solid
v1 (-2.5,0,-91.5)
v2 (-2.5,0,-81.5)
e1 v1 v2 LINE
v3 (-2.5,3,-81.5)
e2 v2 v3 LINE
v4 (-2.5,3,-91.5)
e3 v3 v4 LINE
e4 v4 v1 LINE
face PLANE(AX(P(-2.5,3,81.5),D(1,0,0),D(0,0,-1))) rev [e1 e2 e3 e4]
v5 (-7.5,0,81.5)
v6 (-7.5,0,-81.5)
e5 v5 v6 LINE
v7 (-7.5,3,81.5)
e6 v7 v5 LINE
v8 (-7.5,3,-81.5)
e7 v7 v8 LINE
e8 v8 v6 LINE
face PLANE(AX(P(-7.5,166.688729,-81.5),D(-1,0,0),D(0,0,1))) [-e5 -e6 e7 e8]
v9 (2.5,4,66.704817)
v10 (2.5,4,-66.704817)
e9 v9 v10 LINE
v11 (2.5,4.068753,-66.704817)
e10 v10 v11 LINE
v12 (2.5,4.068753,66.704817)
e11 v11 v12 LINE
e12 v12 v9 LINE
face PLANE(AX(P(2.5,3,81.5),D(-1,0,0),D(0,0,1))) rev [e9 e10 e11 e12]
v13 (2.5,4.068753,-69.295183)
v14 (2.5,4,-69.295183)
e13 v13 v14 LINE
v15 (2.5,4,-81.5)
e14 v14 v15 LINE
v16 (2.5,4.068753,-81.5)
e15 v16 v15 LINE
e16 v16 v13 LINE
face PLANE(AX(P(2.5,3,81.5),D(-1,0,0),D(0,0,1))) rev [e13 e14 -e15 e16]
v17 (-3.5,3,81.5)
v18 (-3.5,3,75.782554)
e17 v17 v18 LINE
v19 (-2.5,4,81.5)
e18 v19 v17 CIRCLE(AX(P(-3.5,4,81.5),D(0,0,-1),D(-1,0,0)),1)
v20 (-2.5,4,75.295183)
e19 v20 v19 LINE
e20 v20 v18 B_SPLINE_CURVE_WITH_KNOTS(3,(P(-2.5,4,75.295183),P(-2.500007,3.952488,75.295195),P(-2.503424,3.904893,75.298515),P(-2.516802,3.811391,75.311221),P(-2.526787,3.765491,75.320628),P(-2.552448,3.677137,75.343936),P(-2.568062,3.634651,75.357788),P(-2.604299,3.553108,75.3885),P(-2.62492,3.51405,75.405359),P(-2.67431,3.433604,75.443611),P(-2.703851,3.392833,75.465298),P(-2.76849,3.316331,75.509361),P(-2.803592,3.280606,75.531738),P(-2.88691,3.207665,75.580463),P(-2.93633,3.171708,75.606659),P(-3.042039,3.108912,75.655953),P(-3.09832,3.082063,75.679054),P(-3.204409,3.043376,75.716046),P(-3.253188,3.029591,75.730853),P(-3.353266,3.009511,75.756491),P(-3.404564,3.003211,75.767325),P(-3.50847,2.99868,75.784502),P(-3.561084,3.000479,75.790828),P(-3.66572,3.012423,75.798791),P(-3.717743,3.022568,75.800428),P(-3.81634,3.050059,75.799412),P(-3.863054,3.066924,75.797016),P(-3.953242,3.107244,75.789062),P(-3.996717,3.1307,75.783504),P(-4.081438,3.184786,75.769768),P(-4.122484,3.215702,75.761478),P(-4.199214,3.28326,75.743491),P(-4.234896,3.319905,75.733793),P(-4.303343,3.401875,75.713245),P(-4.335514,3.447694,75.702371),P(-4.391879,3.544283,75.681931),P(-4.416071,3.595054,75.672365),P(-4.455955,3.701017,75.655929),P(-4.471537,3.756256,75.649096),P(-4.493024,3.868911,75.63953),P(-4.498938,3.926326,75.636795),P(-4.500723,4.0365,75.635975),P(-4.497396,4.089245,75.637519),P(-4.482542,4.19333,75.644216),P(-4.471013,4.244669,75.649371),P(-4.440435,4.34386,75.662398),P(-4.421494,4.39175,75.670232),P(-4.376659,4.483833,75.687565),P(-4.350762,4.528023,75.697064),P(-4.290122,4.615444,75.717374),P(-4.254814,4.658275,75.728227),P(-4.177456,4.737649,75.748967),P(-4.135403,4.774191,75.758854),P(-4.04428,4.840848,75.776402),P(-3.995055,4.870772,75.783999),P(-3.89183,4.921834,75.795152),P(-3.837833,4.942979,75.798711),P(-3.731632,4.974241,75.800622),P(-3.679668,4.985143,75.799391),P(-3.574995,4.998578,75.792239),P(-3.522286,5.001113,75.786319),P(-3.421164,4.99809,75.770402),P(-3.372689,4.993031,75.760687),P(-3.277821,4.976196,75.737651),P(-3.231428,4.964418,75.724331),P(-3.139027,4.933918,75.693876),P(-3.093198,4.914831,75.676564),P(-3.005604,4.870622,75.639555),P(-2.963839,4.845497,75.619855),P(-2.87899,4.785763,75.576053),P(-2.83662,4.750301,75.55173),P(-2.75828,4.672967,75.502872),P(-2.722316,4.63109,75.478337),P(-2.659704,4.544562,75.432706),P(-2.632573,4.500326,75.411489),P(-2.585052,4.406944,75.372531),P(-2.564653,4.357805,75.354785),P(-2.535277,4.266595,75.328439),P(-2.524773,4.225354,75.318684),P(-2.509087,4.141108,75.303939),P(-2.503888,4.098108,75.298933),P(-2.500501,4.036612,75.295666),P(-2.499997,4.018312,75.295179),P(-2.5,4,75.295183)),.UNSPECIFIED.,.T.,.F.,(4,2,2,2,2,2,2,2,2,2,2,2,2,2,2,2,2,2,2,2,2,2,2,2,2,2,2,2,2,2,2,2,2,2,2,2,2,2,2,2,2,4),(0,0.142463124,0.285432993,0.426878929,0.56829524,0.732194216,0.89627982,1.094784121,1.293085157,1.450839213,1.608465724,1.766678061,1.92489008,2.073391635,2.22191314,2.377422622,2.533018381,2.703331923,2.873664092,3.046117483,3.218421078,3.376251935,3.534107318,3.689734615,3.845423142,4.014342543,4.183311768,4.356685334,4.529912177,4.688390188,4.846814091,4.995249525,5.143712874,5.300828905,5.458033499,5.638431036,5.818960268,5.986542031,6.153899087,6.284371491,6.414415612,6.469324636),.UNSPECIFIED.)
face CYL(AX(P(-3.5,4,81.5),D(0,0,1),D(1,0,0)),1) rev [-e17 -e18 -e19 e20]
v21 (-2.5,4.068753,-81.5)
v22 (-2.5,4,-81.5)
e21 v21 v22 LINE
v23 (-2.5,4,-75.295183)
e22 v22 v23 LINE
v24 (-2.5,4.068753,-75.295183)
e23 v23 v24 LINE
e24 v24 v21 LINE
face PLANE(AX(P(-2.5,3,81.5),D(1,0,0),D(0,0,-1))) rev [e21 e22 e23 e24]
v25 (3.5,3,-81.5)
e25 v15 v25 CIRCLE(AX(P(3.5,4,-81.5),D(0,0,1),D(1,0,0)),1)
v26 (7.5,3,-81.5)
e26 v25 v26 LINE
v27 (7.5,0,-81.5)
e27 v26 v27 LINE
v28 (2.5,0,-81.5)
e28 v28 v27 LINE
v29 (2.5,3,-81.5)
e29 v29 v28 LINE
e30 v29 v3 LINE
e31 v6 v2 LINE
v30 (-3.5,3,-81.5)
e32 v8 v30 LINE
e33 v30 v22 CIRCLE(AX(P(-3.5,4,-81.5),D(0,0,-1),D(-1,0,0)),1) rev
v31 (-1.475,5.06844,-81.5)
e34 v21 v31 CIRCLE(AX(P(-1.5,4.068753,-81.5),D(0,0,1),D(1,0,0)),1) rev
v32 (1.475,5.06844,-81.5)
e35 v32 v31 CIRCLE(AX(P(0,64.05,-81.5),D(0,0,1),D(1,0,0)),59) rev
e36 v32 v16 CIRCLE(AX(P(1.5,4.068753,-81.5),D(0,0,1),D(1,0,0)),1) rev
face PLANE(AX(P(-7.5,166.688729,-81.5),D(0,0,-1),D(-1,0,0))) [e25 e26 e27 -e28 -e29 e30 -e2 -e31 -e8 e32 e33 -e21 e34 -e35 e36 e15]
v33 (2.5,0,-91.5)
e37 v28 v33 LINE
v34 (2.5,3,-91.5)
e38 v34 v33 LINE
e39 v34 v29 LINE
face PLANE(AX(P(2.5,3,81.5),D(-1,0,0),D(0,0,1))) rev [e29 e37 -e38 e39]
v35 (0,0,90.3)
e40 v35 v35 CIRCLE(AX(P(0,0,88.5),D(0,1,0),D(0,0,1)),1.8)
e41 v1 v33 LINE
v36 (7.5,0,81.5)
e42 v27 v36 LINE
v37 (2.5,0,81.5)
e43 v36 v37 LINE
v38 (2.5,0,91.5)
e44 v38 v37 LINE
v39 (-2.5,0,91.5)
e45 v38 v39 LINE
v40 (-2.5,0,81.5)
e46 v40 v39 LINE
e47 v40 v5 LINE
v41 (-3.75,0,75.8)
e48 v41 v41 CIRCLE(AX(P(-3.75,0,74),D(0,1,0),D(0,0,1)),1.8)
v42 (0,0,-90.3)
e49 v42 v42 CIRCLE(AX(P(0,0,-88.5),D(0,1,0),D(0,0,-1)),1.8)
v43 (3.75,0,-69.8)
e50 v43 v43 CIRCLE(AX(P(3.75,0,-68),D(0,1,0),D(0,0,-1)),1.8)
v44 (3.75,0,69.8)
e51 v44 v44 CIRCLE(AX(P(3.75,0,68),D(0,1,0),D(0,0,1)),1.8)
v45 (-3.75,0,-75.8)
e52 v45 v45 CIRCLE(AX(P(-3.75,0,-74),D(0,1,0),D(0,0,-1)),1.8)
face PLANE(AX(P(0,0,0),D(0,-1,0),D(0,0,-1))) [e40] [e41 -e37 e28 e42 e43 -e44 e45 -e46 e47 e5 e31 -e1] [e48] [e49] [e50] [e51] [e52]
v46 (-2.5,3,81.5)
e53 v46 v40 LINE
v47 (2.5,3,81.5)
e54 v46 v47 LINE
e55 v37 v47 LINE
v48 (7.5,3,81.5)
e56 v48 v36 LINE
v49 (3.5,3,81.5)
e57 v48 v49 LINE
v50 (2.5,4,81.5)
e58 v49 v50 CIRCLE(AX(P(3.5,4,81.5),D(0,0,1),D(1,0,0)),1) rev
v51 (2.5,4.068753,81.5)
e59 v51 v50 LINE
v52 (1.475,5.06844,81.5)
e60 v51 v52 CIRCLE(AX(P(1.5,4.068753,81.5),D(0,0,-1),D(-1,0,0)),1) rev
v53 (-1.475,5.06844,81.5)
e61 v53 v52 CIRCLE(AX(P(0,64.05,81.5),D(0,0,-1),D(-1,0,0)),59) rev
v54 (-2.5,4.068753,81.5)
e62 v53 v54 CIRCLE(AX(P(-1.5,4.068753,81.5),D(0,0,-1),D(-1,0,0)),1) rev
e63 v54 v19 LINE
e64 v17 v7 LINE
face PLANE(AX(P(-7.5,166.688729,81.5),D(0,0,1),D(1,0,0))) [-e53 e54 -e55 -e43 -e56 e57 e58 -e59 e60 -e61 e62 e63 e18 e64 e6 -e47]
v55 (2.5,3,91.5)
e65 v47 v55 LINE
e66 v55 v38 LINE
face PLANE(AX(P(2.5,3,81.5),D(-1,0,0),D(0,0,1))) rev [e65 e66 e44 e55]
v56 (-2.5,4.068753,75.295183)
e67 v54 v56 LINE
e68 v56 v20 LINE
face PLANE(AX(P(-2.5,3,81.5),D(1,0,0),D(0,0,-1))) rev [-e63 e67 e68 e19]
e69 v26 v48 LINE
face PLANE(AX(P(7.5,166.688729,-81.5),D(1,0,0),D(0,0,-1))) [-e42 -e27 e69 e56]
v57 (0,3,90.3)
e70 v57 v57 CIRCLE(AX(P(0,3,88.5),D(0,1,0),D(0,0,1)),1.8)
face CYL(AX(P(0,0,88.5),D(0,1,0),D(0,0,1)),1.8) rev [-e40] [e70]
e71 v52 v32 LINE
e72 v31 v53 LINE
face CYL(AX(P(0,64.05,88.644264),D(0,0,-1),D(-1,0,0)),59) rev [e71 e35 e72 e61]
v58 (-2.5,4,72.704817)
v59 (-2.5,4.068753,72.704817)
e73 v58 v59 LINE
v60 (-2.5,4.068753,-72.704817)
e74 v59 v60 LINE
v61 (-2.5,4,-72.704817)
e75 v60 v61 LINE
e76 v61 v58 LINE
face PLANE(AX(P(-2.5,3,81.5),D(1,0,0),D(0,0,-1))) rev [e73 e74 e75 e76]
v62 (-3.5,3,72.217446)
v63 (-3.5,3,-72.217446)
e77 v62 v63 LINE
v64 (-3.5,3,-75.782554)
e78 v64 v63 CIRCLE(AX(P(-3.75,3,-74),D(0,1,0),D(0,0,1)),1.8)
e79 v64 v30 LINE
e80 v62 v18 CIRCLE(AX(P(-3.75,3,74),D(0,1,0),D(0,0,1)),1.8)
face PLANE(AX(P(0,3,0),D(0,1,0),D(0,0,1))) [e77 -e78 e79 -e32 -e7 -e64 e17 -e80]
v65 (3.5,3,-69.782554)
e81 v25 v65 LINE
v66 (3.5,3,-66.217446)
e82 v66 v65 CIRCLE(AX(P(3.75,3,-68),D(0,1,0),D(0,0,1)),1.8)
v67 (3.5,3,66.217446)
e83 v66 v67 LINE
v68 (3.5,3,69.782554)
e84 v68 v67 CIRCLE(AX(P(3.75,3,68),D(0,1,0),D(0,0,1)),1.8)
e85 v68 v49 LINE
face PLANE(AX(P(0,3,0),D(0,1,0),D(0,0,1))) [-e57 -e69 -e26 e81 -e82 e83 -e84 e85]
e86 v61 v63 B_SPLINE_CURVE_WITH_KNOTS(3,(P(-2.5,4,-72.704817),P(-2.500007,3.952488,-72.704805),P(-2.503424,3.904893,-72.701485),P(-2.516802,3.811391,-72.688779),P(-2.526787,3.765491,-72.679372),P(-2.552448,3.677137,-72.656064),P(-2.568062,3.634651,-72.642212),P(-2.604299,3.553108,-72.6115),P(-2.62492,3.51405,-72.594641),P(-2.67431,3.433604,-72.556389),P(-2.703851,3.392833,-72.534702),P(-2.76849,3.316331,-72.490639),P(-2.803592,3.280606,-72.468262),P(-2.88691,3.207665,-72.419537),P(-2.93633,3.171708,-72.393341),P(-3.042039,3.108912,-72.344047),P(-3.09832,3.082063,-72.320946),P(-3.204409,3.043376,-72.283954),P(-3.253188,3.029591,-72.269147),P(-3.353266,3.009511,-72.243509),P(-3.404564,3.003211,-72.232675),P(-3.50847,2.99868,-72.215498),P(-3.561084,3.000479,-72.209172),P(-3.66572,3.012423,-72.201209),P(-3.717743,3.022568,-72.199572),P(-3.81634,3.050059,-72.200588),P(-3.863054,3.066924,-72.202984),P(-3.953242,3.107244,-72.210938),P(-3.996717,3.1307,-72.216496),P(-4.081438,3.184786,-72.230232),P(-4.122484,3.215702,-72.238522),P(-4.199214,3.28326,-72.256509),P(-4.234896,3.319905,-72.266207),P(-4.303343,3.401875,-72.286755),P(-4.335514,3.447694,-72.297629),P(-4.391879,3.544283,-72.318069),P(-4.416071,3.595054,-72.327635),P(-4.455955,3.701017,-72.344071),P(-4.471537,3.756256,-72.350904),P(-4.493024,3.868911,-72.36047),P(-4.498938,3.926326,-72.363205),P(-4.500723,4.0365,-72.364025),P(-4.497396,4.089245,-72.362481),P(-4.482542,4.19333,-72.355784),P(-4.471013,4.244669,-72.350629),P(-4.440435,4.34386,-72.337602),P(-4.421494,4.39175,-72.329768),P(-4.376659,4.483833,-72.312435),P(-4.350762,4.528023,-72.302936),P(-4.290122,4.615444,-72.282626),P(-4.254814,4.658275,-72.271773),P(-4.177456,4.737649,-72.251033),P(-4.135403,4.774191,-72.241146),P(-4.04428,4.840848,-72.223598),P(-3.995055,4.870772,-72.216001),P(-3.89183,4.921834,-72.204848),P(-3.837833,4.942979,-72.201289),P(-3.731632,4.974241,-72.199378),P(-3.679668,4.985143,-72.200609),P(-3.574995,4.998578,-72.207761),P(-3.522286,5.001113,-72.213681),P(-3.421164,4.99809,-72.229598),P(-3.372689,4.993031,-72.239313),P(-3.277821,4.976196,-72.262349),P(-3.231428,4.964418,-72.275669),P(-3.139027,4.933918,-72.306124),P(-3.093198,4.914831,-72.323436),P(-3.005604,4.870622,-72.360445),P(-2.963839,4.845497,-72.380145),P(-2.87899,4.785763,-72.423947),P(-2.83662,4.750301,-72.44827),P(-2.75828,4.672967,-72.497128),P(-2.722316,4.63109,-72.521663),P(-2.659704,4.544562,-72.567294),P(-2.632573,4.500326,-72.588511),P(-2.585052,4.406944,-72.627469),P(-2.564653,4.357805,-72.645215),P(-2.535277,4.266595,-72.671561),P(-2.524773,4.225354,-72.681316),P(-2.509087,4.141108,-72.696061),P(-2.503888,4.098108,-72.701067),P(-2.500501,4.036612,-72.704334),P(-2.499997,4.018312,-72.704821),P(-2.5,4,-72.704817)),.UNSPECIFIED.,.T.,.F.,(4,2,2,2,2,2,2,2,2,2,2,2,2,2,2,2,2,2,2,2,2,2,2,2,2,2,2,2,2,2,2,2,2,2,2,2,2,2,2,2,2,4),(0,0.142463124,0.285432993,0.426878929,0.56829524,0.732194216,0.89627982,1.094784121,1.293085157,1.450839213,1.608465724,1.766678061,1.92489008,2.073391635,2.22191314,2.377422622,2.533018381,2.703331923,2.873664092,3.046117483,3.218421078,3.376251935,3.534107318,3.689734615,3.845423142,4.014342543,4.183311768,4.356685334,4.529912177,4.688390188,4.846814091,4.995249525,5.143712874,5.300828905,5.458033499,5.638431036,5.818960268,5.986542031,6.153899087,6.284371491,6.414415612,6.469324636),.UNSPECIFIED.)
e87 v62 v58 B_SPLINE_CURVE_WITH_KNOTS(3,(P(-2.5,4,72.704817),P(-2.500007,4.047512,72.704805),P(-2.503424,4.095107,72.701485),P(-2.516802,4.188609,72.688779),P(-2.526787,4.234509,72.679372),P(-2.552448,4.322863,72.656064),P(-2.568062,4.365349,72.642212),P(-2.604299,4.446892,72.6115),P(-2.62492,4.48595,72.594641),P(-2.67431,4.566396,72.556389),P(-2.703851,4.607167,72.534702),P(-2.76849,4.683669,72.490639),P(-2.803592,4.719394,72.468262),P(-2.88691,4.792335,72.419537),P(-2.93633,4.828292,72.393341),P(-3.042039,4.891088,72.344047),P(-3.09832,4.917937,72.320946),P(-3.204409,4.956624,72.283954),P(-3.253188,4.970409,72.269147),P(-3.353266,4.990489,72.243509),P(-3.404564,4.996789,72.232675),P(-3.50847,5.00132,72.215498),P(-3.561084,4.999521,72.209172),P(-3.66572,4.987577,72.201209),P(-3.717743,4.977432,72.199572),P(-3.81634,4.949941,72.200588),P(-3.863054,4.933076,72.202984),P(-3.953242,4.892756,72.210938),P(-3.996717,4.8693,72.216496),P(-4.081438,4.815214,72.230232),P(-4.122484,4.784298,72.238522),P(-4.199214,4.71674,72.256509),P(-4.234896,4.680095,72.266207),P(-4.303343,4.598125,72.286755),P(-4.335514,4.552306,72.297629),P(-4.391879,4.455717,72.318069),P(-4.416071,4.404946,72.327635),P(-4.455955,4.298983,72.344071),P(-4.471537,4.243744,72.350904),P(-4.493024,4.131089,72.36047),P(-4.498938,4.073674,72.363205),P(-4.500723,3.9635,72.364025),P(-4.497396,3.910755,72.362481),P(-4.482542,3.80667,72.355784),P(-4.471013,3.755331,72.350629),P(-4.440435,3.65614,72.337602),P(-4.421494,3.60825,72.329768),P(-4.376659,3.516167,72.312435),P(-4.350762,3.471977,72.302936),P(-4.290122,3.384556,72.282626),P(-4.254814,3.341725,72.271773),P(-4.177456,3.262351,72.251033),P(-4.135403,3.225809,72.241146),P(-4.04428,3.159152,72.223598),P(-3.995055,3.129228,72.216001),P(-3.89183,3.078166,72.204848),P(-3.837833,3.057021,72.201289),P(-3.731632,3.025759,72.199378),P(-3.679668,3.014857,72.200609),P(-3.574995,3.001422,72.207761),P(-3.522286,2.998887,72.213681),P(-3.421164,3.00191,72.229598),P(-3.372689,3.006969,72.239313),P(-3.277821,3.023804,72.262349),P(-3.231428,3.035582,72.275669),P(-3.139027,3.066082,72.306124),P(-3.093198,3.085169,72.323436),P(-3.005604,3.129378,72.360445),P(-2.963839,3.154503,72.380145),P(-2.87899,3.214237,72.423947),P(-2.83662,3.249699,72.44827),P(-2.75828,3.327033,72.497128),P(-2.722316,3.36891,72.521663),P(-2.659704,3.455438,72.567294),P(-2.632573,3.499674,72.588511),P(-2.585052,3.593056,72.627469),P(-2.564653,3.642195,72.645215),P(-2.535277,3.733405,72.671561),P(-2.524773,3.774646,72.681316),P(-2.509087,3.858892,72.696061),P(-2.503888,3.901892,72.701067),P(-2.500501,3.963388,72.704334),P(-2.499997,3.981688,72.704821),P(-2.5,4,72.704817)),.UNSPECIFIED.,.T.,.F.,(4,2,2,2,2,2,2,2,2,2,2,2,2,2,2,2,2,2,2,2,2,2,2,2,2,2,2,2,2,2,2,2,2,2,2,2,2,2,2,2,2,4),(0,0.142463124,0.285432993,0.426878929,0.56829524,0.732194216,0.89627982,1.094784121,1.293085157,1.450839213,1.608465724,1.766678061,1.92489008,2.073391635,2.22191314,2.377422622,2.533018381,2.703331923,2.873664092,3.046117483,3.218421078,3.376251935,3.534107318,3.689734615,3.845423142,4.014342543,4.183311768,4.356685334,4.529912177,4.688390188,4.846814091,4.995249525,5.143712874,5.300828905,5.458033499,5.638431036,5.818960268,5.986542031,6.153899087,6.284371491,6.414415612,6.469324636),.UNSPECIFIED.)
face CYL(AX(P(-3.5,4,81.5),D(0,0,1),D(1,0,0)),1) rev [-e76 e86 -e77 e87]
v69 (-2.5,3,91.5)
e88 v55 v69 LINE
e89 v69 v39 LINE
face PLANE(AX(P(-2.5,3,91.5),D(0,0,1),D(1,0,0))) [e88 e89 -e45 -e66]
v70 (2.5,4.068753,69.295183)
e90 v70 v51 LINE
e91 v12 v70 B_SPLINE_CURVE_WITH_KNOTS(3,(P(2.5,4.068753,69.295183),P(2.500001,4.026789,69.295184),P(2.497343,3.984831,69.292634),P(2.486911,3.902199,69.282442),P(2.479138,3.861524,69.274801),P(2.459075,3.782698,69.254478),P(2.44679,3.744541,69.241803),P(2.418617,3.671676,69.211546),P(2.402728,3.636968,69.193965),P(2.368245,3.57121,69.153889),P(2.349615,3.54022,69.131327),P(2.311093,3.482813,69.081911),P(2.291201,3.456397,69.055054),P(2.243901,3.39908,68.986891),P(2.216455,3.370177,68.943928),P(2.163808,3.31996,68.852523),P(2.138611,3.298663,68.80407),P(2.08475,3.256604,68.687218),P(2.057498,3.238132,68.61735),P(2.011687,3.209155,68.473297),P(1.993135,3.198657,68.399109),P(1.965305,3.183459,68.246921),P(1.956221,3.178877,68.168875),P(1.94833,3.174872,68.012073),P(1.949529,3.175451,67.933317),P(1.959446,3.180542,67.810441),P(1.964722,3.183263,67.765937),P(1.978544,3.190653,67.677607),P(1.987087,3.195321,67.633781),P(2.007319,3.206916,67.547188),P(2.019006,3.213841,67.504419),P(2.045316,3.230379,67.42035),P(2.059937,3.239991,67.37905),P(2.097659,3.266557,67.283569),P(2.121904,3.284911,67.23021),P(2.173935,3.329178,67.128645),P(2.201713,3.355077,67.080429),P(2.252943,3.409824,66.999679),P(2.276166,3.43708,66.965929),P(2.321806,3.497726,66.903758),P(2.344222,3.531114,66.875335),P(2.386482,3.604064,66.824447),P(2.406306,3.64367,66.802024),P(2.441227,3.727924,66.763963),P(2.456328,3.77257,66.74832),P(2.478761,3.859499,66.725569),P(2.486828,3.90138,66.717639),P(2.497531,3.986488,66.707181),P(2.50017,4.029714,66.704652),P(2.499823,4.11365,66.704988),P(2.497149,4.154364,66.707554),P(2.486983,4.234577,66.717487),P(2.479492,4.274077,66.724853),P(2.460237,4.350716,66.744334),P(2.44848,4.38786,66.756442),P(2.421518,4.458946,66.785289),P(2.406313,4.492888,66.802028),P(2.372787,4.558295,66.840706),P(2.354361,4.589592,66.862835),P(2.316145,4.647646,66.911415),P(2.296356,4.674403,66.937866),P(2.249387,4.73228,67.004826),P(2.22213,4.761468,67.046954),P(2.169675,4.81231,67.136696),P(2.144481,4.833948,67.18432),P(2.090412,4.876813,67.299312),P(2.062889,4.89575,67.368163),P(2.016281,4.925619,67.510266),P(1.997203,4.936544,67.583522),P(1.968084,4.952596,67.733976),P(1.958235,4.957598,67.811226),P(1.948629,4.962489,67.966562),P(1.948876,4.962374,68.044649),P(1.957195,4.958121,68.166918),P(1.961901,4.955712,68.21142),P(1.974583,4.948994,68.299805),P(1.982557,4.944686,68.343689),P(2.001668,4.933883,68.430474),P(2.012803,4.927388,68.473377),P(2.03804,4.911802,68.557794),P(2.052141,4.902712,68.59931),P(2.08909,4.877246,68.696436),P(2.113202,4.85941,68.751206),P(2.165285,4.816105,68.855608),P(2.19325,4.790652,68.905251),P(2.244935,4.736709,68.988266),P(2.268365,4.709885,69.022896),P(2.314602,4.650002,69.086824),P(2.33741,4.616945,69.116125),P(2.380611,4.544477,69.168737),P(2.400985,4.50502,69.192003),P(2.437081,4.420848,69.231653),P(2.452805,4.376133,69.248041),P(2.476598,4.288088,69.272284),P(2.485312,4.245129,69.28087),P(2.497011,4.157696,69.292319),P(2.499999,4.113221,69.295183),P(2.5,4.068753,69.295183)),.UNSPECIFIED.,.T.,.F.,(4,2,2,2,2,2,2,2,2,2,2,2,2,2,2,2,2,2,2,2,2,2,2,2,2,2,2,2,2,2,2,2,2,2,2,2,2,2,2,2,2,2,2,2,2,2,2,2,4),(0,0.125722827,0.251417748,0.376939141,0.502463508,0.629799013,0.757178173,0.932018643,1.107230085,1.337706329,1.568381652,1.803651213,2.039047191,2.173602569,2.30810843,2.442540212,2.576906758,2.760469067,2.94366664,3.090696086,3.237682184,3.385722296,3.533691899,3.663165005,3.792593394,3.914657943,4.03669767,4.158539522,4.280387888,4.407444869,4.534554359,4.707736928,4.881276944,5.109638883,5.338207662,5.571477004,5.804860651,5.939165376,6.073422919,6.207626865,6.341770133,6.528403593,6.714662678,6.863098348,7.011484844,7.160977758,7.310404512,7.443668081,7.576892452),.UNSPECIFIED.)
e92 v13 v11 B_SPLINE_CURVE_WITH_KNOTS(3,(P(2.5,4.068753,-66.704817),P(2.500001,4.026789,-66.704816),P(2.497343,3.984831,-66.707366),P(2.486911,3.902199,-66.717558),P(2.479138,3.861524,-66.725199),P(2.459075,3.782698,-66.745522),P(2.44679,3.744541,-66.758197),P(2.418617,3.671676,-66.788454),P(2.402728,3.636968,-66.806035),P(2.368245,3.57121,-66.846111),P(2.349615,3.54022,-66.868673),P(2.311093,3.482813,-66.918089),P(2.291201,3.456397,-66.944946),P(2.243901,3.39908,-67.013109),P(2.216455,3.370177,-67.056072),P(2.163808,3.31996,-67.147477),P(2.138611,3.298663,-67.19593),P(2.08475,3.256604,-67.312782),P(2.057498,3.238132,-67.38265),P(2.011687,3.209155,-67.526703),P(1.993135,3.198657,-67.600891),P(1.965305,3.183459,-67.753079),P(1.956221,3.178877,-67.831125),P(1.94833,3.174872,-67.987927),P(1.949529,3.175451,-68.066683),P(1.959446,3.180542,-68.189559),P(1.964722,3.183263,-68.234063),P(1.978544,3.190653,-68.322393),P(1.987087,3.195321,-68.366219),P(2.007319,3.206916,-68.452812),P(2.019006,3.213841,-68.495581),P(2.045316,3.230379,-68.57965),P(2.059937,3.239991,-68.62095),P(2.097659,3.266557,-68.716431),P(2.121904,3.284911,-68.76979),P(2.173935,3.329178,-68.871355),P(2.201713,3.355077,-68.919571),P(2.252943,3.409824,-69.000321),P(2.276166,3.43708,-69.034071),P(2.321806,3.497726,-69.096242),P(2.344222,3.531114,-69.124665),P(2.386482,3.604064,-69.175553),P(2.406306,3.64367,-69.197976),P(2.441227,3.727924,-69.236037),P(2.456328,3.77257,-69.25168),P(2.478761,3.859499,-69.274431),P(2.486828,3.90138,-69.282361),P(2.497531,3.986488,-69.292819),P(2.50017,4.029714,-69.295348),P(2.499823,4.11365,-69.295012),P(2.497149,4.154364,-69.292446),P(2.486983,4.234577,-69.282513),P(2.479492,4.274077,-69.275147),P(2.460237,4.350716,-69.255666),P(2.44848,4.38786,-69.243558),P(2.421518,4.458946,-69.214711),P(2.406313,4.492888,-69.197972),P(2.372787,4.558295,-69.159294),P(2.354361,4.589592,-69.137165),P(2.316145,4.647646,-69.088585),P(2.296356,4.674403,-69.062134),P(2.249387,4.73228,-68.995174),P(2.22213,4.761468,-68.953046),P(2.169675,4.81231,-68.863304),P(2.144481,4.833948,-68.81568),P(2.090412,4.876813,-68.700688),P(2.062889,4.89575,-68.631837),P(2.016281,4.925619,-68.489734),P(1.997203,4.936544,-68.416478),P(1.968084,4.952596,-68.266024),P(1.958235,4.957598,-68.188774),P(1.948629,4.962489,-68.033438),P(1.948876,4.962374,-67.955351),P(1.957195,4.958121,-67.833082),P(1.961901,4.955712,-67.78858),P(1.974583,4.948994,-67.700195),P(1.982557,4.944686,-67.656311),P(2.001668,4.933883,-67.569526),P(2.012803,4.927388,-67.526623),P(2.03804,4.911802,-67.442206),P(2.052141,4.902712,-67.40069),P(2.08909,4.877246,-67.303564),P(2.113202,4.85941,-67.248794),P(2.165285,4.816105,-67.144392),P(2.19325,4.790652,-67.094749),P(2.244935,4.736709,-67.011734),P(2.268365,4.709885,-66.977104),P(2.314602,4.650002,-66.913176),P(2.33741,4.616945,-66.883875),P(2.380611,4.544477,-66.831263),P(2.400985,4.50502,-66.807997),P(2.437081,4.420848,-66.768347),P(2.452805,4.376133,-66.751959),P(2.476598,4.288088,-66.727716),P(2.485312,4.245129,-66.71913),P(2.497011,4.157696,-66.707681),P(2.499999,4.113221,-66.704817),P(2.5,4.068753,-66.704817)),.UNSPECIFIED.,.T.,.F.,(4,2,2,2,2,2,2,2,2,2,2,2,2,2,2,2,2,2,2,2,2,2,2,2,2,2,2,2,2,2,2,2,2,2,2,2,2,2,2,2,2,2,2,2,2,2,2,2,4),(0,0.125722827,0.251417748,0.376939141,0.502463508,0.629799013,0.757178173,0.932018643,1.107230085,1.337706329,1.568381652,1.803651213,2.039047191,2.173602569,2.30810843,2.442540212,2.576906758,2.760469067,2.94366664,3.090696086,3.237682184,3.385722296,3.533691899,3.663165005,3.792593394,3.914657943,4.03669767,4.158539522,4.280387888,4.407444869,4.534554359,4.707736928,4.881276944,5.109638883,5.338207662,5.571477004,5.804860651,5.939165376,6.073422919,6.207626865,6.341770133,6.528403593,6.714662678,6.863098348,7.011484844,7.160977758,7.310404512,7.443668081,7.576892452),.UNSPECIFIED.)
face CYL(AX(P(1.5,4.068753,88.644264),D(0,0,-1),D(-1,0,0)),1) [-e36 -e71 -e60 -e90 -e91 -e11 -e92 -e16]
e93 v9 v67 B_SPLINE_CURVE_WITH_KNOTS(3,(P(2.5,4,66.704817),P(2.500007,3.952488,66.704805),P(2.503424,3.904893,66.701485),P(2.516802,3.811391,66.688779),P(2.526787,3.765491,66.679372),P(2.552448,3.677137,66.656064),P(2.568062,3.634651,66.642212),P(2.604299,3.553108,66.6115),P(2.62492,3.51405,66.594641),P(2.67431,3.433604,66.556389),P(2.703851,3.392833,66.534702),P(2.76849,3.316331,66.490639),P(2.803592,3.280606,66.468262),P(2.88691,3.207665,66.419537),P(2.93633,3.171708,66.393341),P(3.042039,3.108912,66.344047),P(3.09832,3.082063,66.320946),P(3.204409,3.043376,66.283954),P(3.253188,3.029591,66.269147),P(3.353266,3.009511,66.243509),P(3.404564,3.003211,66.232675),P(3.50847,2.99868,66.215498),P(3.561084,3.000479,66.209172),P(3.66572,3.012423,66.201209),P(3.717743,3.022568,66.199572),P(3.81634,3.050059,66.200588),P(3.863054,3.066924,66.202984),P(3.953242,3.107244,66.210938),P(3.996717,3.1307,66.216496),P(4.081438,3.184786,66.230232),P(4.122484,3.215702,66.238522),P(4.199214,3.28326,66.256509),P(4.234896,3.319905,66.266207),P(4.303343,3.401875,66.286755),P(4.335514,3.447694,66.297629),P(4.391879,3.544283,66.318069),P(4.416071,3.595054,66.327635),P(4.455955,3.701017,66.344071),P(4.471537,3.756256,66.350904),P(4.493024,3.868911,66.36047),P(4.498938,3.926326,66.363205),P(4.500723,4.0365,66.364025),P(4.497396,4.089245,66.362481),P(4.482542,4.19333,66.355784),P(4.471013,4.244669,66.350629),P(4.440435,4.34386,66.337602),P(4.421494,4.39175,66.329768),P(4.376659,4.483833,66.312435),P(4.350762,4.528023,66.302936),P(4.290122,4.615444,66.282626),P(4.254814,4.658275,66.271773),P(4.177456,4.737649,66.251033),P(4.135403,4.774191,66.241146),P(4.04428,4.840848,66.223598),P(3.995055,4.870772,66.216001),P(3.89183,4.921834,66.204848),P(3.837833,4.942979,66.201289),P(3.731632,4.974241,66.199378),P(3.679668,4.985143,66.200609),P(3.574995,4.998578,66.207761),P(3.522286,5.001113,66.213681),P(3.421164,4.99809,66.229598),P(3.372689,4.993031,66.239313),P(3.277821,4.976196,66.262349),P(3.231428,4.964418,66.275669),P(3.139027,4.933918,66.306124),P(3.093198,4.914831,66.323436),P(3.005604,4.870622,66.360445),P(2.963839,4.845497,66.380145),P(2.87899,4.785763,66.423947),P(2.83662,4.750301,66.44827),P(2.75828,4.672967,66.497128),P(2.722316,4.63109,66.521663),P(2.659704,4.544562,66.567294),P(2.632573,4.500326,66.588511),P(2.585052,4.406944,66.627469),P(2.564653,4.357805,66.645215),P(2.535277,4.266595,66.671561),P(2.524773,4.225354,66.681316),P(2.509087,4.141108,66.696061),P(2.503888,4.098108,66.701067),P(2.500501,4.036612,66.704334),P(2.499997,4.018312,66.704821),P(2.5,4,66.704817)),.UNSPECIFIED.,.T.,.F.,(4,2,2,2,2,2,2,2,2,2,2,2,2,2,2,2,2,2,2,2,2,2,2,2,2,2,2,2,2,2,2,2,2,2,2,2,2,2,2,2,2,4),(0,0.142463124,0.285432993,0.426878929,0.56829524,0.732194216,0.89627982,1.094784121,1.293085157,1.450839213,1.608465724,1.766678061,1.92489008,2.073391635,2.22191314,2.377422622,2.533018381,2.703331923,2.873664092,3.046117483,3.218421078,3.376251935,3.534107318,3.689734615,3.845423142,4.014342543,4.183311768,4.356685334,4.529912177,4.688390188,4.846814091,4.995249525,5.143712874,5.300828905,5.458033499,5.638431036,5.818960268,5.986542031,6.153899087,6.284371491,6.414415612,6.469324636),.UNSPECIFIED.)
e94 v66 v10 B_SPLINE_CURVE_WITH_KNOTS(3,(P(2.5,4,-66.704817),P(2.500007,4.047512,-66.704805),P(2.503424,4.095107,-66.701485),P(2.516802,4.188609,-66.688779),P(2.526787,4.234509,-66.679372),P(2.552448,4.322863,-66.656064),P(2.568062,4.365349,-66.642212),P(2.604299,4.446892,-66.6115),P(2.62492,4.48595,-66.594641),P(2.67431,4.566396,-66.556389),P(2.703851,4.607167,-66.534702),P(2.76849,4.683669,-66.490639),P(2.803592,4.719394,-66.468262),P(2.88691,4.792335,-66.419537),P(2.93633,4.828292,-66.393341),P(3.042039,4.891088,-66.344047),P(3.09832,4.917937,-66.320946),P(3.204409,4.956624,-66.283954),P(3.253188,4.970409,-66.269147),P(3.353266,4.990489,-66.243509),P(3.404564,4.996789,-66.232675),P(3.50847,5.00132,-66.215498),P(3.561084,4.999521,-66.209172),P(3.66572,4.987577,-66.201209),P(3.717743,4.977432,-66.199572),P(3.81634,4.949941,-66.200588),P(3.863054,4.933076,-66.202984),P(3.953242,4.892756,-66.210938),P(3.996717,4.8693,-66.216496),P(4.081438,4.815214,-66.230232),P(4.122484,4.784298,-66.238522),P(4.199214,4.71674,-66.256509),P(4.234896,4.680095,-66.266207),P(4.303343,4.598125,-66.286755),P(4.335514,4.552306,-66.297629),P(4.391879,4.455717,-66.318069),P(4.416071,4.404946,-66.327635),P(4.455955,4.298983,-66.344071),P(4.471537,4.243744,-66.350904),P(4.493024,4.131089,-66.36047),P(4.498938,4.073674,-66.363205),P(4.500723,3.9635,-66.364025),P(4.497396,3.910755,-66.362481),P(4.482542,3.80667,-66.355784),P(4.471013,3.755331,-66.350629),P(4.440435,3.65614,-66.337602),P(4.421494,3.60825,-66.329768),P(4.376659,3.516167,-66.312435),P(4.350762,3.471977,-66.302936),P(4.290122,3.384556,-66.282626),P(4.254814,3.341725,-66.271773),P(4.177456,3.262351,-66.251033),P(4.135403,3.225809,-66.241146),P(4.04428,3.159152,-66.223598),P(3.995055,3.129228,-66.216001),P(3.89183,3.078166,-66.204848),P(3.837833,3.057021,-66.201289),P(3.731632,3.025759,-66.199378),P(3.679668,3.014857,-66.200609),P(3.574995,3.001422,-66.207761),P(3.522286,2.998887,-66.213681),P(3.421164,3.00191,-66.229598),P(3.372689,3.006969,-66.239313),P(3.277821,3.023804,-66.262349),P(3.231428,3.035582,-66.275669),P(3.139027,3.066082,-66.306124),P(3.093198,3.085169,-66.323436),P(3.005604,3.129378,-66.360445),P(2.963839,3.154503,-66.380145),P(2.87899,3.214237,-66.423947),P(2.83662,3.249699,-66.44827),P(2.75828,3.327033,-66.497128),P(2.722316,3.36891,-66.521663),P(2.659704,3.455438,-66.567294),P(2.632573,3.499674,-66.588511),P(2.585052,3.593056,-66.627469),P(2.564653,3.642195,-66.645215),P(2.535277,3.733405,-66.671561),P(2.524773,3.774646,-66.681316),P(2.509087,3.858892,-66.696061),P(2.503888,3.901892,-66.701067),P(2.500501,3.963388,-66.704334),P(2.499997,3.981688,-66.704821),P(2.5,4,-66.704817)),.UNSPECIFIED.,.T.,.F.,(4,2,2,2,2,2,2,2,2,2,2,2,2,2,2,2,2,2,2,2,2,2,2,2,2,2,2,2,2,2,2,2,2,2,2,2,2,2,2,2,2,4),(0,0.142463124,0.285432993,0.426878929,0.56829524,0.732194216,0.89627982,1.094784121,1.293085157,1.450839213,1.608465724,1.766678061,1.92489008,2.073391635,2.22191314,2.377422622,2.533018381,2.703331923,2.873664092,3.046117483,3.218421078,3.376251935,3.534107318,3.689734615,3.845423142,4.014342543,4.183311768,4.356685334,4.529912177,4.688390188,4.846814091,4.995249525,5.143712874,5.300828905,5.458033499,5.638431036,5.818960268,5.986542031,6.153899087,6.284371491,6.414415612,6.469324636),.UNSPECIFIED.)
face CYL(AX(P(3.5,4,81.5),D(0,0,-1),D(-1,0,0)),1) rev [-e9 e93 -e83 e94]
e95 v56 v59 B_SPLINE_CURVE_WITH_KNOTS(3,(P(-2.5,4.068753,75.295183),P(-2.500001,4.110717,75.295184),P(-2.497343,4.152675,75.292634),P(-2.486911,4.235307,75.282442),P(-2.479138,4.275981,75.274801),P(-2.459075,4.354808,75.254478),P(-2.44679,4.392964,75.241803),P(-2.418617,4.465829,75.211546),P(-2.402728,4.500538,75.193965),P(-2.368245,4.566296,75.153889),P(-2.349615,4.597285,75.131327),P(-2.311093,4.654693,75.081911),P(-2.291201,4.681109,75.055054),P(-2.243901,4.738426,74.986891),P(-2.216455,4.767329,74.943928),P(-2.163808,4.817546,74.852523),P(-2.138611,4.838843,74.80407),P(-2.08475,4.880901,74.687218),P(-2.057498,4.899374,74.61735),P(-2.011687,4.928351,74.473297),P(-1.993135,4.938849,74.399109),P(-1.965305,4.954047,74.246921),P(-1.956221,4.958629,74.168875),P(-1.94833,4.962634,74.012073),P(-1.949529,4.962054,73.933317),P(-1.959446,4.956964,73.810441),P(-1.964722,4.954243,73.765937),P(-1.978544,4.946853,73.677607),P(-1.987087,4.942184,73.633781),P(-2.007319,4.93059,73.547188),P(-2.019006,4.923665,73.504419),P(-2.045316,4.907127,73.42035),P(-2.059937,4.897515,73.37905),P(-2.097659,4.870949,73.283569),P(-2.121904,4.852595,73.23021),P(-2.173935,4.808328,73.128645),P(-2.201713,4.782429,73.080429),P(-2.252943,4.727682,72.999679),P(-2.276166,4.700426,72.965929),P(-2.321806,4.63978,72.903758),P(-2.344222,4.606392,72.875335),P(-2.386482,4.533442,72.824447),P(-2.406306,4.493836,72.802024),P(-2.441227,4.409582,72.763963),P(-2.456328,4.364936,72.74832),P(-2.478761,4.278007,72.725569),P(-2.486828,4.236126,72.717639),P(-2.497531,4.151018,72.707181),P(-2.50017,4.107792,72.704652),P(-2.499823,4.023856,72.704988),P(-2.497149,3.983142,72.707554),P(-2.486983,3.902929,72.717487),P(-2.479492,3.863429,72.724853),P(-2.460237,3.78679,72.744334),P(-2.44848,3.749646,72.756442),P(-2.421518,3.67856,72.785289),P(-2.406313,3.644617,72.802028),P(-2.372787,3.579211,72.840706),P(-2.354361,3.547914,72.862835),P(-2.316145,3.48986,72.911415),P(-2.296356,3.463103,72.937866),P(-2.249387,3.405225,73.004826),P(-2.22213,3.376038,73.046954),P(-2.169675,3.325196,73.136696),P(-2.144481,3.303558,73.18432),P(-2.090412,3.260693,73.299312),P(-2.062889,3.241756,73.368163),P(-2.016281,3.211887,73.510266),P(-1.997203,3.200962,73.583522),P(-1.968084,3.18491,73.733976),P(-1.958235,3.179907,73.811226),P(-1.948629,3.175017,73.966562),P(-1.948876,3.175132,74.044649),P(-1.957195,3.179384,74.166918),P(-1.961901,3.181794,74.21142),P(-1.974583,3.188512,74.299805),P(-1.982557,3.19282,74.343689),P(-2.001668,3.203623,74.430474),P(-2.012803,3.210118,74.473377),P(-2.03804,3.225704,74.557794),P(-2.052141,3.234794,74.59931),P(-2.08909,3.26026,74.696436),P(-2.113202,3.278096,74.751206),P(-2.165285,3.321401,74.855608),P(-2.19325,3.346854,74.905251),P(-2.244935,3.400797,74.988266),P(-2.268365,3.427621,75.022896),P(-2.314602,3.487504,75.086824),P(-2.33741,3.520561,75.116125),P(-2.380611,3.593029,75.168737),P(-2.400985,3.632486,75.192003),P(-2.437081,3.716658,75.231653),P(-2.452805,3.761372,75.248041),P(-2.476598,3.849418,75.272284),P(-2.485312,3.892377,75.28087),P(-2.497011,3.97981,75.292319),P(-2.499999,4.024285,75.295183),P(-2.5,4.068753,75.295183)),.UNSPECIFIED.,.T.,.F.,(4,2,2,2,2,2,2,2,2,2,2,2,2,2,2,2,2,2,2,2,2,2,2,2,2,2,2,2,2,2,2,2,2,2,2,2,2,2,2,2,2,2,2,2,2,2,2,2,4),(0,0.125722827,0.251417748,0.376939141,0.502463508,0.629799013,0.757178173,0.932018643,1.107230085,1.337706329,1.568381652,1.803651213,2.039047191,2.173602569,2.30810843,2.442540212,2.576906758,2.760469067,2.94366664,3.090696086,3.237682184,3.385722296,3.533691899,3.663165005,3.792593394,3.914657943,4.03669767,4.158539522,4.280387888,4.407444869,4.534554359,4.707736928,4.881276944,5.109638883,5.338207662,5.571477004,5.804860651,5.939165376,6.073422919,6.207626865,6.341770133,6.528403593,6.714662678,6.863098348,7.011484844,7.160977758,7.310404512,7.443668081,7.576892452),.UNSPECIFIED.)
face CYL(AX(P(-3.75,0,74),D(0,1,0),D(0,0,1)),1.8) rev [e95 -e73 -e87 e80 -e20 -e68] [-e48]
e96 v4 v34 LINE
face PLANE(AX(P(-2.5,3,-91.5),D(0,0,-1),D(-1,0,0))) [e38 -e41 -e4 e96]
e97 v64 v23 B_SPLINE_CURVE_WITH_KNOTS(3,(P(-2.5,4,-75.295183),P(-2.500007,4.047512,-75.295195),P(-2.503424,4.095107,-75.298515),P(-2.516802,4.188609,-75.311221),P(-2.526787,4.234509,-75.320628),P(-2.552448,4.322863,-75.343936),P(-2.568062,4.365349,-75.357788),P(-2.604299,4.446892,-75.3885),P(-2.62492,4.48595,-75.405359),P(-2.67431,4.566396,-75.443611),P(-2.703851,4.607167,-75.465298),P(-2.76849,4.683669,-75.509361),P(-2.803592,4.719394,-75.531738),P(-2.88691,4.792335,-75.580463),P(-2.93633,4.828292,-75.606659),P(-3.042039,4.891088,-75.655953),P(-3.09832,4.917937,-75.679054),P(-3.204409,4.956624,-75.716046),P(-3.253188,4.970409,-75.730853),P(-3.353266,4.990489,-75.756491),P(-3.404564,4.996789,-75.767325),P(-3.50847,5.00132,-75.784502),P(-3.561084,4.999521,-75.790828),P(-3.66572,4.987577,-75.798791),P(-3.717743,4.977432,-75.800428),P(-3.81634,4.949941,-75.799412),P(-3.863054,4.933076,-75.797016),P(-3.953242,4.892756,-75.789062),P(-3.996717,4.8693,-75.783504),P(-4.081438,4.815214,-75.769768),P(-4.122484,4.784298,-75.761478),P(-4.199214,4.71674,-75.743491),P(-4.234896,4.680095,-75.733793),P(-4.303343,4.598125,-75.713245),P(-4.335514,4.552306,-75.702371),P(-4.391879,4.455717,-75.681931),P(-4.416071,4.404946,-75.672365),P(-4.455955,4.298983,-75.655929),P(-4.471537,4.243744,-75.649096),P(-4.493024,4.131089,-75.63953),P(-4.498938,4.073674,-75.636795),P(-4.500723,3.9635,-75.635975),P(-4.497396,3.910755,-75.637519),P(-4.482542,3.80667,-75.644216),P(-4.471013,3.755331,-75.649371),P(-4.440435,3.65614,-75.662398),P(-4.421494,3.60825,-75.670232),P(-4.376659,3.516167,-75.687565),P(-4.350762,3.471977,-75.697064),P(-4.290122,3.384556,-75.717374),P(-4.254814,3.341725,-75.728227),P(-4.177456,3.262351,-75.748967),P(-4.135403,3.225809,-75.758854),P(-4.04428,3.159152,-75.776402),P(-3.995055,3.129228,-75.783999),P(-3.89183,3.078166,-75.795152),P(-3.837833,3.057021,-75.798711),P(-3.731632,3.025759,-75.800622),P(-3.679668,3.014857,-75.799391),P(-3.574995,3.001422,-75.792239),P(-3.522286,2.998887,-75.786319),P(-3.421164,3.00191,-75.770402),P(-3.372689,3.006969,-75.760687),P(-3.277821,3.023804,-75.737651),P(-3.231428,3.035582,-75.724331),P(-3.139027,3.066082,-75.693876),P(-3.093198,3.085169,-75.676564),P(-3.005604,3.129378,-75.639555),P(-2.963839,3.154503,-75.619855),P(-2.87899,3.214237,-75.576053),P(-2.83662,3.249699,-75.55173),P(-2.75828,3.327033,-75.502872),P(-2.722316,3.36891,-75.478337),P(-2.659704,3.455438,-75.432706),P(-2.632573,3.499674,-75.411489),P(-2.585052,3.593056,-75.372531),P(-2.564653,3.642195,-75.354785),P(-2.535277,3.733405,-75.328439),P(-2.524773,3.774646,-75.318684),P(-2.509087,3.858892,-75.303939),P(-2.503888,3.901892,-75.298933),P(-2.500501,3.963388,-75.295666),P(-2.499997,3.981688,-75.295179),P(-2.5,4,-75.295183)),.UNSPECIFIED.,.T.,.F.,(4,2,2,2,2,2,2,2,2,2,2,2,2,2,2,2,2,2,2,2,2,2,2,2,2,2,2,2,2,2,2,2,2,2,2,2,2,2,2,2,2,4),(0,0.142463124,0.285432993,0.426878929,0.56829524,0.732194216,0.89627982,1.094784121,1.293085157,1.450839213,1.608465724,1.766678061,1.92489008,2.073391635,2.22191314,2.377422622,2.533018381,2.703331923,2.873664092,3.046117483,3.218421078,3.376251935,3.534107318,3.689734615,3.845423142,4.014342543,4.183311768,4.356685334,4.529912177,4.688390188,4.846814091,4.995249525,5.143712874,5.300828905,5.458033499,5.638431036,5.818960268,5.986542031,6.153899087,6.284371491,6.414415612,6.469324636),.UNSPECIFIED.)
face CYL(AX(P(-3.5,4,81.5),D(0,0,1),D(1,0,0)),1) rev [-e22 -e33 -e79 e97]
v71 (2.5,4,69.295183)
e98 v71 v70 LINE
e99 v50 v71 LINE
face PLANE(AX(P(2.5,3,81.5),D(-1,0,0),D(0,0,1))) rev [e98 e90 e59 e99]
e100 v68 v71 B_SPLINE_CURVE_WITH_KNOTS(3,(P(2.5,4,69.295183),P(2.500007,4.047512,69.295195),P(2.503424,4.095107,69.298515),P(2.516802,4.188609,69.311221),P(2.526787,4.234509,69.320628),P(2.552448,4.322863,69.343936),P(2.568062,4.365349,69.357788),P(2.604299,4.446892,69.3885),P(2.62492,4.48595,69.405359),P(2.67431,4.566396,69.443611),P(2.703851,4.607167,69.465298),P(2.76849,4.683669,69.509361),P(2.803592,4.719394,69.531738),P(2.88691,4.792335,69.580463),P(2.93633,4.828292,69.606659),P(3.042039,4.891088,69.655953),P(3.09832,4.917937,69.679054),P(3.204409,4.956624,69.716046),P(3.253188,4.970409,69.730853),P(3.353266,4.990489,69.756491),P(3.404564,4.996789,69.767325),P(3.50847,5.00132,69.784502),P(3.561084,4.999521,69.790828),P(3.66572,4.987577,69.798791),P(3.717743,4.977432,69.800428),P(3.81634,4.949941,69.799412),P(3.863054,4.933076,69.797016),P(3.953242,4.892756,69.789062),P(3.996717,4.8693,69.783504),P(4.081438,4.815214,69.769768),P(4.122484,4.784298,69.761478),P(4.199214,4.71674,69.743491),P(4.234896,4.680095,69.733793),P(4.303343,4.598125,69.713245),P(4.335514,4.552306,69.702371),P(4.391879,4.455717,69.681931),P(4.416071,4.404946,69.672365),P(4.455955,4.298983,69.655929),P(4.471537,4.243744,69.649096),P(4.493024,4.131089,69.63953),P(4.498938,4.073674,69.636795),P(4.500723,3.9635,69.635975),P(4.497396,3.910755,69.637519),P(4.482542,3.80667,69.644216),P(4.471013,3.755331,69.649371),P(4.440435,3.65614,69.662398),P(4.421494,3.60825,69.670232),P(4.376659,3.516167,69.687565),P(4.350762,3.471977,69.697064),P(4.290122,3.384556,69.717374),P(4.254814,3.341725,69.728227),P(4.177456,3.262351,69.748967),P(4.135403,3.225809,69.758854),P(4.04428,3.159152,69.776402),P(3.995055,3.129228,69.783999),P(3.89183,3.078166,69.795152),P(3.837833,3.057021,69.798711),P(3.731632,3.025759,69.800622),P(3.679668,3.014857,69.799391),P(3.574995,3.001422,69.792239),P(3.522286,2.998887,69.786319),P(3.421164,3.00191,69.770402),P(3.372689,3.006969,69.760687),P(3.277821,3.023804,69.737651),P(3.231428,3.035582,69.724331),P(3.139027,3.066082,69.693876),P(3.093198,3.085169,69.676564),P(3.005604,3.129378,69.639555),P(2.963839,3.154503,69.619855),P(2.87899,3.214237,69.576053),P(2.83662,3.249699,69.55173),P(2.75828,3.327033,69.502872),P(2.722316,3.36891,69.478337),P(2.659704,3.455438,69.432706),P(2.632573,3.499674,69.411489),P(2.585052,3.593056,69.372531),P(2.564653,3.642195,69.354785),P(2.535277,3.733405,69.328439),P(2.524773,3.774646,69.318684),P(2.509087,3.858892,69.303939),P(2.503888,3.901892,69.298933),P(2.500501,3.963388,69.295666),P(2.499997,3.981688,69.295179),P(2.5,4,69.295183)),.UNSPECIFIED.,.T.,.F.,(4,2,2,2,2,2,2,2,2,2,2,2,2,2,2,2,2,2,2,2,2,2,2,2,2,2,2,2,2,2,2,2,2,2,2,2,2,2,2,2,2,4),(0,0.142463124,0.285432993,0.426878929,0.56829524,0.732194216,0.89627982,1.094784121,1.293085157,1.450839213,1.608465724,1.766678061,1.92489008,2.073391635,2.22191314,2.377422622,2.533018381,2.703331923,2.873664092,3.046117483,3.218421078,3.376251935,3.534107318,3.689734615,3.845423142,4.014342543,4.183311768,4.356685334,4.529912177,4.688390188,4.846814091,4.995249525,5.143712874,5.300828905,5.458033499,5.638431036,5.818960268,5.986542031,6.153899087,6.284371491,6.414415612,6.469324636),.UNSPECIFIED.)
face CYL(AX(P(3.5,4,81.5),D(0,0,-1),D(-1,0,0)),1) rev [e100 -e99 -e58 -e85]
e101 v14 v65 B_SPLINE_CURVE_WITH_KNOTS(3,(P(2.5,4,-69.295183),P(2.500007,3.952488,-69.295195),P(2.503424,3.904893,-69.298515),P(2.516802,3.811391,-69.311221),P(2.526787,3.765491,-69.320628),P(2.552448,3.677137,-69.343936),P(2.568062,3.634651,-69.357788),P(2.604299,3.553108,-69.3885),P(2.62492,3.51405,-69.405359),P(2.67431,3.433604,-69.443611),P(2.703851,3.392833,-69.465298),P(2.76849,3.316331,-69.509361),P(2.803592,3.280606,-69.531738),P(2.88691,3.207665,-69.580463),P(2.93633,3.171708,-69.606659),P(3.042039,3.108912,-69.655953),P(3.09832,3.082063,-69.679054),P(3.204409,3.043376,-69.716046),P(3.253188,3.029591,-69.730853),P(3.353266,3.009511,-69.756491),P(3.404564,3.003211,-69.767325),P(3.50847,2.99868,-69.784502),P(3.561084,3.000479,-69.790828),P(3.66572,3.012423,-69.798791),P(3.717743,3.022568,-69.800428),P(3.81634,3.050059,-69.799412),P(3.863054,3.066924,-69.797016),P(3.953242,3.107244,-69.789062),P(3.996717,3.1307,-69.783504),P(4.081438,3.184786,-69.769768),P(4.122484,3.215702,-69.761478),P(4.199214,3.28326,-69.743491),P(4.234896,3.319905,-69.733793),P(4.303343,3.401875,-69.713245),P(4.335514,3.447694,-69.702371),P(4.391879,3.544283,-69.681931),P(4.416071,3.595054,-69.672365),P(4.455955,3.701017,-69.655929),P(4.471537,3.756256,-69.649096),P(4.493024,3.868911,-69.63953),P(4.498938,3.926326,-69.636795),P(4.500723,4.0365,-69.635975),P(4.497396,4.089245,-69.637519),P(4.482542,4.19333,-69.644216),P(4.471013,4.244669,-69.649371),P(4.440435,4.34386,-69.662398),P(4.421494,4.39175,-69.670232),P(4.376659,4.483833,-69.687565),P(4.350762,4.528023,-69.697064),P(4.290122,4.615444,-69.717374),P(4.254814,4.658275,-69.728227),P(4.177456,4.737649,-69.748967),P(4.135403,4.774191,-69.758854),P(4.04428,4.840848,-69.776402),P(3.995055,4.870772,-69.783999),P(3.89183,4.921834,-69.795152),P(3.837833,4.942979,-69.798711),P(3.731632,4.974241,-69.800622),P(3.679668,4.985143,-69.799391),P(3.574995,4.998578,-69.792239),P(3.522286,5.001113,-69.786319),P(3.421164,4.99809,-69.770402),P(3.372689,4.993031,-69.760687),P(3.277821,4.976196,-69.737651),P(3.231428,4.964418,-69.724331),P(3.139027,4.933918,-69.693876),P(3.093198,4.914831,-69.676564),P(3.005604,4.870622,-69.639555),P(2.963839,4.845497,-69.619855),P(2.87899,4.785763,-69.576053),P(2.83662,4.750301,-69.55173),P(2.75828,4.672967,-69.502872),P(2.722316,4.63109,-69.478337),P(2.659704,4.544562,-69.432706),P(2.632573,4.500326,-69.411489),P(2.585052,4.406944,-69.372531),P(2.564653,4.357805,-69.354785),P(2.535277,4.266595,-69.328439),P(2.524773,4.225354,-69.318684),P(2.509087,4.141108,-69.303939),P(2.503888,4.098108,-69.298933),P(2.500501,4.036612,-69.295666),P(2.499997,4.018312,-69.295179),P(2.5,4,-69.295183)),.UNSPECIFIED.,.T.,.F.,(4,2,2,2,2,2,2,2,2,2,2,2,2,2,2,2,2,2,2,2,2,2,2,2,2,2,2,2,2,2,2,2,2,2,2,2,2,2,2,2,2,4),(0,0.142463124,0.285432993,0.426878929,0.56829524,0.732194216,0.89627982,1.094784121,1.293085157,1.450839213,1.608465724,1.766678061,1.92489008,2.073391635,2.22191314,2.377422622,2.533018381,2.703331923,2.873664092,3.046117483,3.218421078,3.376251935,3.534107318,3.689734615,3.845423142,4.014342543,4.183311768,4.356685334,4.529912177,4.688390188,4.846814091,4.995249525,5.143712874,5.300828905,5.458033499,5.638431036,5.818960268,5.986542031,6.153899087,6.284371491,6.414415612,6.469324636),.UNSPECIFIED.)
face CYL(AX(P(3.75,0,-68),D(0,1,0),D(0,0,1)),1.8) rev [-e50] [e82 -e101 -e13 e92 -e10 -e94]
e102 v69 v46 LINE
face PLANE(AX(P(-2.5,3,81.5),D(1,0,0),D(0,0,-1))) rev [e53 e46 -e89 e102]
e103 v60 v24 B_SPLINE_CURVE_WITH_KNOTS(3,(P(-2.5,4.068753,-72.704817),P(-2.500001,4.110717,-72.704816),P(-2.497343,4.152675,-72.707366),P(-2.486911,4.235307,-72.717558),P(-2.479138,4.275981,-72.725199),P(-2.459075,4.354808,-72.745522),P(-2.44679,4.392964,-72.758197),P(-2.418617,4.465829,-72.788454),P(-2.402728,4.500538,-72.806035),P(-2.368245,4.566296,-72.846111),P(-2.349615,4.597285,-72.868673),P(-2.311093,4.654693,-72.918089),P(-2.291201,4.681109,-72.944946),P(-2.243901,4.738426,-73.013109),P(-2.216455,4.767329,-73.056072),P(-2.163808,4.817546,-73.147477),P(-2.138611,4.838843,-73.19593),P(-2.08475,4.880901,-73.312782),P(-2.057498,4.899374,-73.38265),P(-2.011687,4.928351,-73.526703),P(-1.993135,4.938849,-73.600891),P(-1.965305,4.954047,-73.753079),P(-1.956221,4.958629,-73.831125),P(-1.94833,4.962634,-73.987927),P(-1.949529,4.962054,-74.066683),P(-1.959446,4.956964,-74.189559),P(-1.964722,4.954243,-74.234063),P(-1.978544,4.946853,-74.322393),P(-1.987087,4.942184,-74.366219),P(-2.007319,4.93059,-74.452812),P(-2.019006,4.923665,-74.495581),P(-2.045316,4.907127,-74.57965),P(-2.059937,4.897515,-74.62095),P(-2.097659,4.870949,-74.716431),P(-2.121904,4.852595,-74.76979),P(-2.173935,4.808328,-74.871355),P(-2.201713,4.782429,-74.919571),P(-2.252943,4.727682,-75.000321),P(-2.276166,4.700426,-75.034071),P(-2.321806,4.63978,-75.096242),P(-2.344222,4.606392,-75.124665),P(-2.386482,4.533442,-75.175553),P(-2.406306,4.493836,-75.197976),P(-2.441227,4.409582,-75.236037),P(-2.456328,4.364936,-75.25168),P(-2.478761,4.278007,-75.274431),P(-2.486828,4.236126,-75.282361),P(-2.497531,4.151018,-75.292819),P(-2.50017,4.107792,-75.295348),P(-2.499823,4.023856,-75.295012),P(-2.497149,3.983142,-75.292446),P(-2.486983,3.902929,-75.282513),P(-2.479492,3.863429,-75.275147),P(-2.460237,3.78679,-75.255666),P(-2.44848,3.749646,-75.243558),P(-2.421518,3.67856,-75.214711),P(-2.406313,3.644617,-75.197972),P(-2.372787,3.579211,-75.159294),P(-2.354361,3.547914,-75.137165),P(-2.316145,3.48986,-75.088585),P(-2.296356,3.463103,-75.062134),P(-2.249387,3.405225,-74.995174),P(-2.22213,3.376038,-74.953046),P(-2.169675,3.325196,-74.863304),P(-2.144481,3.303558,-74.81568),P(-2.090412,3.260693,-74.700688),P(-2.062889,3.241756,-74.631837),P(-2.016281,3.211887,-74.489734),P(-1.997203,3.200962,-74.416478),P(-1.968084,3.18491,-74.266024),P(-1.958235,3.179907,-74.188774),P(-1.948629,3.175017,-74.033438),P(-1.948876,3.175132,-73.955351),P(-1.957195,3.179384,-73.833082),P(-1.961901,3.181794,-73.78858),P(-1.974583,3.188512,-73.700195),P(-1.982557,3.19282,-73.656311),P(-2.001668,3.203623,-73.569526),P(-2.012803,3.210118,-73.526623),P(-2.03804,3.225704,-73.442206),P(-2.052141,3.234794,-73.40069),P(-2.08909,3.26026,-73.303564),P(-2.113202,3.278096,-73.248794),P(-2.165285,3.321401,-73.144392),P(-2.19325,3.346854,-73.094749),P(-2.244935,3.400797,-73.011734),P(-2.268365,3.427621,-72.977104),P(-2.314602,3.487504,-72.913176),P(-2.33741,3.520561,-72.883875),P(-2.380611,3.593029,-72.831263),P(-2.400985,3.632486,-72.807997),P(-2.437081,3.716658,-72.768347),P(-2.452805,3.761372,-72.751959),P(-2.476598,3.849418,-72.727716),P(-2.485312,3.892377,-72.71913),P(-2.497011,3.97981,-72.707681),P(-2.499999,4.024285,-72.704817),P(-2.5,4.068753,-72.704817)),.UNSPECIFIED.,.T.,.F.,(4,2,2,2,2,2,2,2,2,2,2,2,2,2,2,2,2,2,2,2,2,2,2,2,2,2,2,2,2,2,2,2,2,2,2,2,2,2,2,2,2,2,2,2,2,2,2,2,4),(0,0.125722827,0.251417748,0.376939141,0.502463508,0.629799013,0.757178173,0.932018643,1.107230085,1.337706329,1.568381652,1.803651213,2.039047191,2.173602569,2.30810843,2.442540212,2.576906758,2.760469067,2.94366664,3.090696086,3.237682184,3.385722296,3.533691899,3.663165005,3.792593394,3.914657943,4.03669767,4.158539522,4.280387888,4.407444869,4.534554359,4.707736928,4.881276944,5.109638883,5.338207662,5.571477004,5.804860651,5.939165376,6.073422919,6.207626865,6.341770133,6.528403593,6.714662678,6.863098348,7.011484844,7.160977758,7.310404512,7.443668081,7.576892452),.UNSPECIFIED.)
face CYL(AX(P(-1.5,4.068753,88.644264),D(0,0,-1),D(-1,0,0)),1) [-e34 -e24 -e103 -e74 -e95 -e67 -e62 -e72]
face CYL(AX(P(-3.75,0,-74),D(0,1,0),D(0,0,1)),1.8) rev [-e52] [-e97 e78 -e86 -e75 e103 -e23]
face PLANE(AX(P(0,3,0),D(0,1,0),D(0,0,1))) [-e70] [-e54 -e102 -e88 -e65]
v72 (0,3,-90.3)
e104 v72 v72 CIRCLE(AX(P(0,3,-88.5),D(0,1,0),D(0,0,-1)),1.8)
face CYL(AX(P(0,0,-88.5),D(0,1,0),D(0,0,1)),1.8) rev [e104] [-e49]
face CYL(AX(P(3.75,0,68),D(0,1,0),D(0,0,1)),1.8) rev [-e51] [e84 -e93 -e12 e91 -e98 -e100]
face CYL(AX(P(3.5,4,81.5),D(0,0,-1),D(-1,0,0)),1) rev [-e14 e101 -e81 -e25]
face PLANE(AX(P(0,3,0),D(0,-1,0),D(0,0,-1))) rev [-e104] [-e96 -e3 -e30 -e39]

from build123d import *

# Parameters (mm, degrees)
SKETCH1_W               = 5
SKETCH1_H               = 163
BOSS_EXTRUDE1_DEPTH     = 3
BOSS_EXTRUDE2_DEPTH     = 81.5
BOSS_EXTRUDE3_START     = 81.5
BOSS_EXTRUDE3_DEPTH     = 81.5
SKETCH8_W               = 5
SKETCH8_H               = 10
BOSS_EXTRUDE4_DEPTH     = 3
SKETCH6_R               = 1.8
CUT_EXTRUDE1_DEPTH      = 92.58329542
SKETCH9_W               = 15
SKETCH9_H               = 163
BOSS_EXTRUDE5_DEPTH     = 3
FILLET1_R               = 1
CUT_EXTRUDE2_DEPTH      = 92.855865354
CUT_EXTRUDE2_DEPTH_BACK = 92.855865354
SKETCH10_R              = 1.8


with BuildPart() as part:
    # Sketch1 → Boss-Extrude1 (new body)
    with BuildSketch(Plane(origin=(0, 0, 0), x_dir=(1, 0, 0), z_dir=(0, 1, 0))):
        Rectangle(SKETCH1_W, SKETCH1_H)
    extrude(amount=BOSS_EXTRUDE1_DEPTH)

    # Sketch3 → Boss-Extrude2 (add)
    with BuildSketch(Plane.XY):
        with BuildLine():
            Line((-2.5, 3), (-2.5, 5.102989898))
            ThreePointArc((-2.5, 5.102989898), (0, 5.05), (2.5, 5.102989898))
            Line((2.5, 5.102989898), (2.5, 3))
            Line((2.5, 3), (2.5, 0))
            Line((2.5, 0), (-2.5, 0))
            Line((-2.5, 0), (-2.5, 3))
        make_face()
    extrude(amount=BOSS_EXTRUDE2_DEPTH)

    # Sketch7 → Boss-Extrude3 (add)
    with BuildSketch(Plane(origin=(0, 0, 0), x_dir=(-1, 0, 0), z_dir=(0, 0, -1)).offset(BOSS_EXTRUDE3_START)):
        with BuildLine():
            Line((-2.5, 5.102989898), (-2.5, 3))
            Line((-2.5, 3), (2.5, 3))
            Line((2.5, 3), (2.5, 5.102989898))
            ThreePointArc((2.5, 5.102989898), (0, 5.05), (-2.5, 5.102989898))
        make_face()
    extrude(amount=-BOSS_EXTRUDE3_DEPTH)

    # Sketch8 → Boss-Extrude4 (add)
    with BuildSketch(Plane.XZ):
        with Locations((0, 86.5)):
            Rectangle(SKETCH8_W, SKETCH8_H)
        with Locations((0, -86.5)):
            Rectangle(SKETCH8_W, SKETCH8_H)
    extrude(amount=-BOSS_EXTRUDE4_DEPTH)

    # Sketch6 → Cut-Extrude1 (cut, through all)
    with BuildSketch(Plane(origin=(0, 3, 0), x_dir=(1, 0, 0), z_dir=(0, 1, 0))):
        with Locations(Location((0, -88.5, 0), (0, 0, 270))):
            Circle(SKETCH6_R)
        with Locations(Location((0, 88.5, 0), (0, 0, 90))):
            Circle(SKETCH6_R)
    extrude(amount=-CUT_EXTRUDE1_DEPTH, mode=Mode.SUBTRACT)

    # Sketch9 → Boss-Extrude5 (add)
    with BuildSketch(Plane.XZ):
        Rectangle(SKETCH9_W, SKETCH9_H)
    extrude(amount=-BOSS_EXTRUDE5_DEPTH)

    # Fillet1
    # the kernel refuses this fillet: 1 mm, written as the material it adds along each edge
    with BuildSketch(Plane(origin=(2.5, 3, -81.5), x_dir=(0, 1, 0), z_dir=(0, 0, 1)), Plane(origin=(-2.5, 3, 81.5), x_dir=(0, 1, 0), z_dir=(0, 0, -1))) as fillet1_piece_1:
        with BuildLine():
            CenterArc((FILLET1_R, -FILLET1_R), FILLET1_R, 90, 90)
            Line((0, -FILLET1_R), (0, 0))
            Line((0, 0), (FILLET1_R, 0))
        make_face()
    extrude(amount=163)
    # the kernel refuses this fillet: 1 mm, written as the material it takes off along each edge
    with BuildSketch(Plane(origin=(-2.5, 5.102989898, 84.085592418), x_dir=(0, -1, 0), z_dir=(0, 0, -1))) as fillet1_2_piece_1:
        with BuildLine():
            CenterArc((1.034236967, -1), FILLET1_R, 90, 91.432543738)
            ThreePointArc((0.034549516, -1.025), (0.019501965, -0.512424928), (0, 0))
            Line((0, 0), (1.034236967, 0))
        make_face()
    extrude(amount=168.171184836, mode=Mode.SUBTRACT)
    with BuildSketch(Plane(origin=(2.5, 5.102989898, 84.085592418), x_dir=(0, -1, 0), z_dir=(0, 0, -1))) as fillet1_2_piece_2:
        with BuildLine():
            CenterArc((1.034236967, 1), FILLET1_R, 178.567456262, 91.432543738)
            ThreePointArc((0.034549516, 1.025), (0.019501965, 0.512424928), (0, 0))
            Line((0, 0), (1.034236967, 0))
        make_face()
    extrude(amount=168.171184836, mode=Mode.SUBTRACT)

    # Sketch10 → Cut-Extrude2 (cut, two sides: drawn at the far end of the back side and taken through both)
    with BuildSketch(Plane(origin=(0, 3, 0), x_dir=(1, 0, 0), z_dir=(0, 1, 0)).offset(-CUT_EXTRUDE2_DEPTH_BACK)):
        with Locations(Location((-3.75, -74, 0), (0, 0, 270))):
            Circle(SKETCH10_R)
        with Locations(Location((3.75, -68, 0), (0, 0, 270))):
            Circle(SKETCH10_R)
        with Locations(Location((3.75, 68, 0), (0, 0, 262.016443854))):
            Circle(SKETCH10_R)
        with Locations(Location((-3.75, 74, 0), (0, 0, 277.983556156))):
            Circle(SKETCH10_R)
    extrude(amount=CUT_EXTRUDE2_DEPTH + CUT_EXTRUDE2_DEPTH_BACK, mode=Mode.SUBTRACT)


solid = part.part
